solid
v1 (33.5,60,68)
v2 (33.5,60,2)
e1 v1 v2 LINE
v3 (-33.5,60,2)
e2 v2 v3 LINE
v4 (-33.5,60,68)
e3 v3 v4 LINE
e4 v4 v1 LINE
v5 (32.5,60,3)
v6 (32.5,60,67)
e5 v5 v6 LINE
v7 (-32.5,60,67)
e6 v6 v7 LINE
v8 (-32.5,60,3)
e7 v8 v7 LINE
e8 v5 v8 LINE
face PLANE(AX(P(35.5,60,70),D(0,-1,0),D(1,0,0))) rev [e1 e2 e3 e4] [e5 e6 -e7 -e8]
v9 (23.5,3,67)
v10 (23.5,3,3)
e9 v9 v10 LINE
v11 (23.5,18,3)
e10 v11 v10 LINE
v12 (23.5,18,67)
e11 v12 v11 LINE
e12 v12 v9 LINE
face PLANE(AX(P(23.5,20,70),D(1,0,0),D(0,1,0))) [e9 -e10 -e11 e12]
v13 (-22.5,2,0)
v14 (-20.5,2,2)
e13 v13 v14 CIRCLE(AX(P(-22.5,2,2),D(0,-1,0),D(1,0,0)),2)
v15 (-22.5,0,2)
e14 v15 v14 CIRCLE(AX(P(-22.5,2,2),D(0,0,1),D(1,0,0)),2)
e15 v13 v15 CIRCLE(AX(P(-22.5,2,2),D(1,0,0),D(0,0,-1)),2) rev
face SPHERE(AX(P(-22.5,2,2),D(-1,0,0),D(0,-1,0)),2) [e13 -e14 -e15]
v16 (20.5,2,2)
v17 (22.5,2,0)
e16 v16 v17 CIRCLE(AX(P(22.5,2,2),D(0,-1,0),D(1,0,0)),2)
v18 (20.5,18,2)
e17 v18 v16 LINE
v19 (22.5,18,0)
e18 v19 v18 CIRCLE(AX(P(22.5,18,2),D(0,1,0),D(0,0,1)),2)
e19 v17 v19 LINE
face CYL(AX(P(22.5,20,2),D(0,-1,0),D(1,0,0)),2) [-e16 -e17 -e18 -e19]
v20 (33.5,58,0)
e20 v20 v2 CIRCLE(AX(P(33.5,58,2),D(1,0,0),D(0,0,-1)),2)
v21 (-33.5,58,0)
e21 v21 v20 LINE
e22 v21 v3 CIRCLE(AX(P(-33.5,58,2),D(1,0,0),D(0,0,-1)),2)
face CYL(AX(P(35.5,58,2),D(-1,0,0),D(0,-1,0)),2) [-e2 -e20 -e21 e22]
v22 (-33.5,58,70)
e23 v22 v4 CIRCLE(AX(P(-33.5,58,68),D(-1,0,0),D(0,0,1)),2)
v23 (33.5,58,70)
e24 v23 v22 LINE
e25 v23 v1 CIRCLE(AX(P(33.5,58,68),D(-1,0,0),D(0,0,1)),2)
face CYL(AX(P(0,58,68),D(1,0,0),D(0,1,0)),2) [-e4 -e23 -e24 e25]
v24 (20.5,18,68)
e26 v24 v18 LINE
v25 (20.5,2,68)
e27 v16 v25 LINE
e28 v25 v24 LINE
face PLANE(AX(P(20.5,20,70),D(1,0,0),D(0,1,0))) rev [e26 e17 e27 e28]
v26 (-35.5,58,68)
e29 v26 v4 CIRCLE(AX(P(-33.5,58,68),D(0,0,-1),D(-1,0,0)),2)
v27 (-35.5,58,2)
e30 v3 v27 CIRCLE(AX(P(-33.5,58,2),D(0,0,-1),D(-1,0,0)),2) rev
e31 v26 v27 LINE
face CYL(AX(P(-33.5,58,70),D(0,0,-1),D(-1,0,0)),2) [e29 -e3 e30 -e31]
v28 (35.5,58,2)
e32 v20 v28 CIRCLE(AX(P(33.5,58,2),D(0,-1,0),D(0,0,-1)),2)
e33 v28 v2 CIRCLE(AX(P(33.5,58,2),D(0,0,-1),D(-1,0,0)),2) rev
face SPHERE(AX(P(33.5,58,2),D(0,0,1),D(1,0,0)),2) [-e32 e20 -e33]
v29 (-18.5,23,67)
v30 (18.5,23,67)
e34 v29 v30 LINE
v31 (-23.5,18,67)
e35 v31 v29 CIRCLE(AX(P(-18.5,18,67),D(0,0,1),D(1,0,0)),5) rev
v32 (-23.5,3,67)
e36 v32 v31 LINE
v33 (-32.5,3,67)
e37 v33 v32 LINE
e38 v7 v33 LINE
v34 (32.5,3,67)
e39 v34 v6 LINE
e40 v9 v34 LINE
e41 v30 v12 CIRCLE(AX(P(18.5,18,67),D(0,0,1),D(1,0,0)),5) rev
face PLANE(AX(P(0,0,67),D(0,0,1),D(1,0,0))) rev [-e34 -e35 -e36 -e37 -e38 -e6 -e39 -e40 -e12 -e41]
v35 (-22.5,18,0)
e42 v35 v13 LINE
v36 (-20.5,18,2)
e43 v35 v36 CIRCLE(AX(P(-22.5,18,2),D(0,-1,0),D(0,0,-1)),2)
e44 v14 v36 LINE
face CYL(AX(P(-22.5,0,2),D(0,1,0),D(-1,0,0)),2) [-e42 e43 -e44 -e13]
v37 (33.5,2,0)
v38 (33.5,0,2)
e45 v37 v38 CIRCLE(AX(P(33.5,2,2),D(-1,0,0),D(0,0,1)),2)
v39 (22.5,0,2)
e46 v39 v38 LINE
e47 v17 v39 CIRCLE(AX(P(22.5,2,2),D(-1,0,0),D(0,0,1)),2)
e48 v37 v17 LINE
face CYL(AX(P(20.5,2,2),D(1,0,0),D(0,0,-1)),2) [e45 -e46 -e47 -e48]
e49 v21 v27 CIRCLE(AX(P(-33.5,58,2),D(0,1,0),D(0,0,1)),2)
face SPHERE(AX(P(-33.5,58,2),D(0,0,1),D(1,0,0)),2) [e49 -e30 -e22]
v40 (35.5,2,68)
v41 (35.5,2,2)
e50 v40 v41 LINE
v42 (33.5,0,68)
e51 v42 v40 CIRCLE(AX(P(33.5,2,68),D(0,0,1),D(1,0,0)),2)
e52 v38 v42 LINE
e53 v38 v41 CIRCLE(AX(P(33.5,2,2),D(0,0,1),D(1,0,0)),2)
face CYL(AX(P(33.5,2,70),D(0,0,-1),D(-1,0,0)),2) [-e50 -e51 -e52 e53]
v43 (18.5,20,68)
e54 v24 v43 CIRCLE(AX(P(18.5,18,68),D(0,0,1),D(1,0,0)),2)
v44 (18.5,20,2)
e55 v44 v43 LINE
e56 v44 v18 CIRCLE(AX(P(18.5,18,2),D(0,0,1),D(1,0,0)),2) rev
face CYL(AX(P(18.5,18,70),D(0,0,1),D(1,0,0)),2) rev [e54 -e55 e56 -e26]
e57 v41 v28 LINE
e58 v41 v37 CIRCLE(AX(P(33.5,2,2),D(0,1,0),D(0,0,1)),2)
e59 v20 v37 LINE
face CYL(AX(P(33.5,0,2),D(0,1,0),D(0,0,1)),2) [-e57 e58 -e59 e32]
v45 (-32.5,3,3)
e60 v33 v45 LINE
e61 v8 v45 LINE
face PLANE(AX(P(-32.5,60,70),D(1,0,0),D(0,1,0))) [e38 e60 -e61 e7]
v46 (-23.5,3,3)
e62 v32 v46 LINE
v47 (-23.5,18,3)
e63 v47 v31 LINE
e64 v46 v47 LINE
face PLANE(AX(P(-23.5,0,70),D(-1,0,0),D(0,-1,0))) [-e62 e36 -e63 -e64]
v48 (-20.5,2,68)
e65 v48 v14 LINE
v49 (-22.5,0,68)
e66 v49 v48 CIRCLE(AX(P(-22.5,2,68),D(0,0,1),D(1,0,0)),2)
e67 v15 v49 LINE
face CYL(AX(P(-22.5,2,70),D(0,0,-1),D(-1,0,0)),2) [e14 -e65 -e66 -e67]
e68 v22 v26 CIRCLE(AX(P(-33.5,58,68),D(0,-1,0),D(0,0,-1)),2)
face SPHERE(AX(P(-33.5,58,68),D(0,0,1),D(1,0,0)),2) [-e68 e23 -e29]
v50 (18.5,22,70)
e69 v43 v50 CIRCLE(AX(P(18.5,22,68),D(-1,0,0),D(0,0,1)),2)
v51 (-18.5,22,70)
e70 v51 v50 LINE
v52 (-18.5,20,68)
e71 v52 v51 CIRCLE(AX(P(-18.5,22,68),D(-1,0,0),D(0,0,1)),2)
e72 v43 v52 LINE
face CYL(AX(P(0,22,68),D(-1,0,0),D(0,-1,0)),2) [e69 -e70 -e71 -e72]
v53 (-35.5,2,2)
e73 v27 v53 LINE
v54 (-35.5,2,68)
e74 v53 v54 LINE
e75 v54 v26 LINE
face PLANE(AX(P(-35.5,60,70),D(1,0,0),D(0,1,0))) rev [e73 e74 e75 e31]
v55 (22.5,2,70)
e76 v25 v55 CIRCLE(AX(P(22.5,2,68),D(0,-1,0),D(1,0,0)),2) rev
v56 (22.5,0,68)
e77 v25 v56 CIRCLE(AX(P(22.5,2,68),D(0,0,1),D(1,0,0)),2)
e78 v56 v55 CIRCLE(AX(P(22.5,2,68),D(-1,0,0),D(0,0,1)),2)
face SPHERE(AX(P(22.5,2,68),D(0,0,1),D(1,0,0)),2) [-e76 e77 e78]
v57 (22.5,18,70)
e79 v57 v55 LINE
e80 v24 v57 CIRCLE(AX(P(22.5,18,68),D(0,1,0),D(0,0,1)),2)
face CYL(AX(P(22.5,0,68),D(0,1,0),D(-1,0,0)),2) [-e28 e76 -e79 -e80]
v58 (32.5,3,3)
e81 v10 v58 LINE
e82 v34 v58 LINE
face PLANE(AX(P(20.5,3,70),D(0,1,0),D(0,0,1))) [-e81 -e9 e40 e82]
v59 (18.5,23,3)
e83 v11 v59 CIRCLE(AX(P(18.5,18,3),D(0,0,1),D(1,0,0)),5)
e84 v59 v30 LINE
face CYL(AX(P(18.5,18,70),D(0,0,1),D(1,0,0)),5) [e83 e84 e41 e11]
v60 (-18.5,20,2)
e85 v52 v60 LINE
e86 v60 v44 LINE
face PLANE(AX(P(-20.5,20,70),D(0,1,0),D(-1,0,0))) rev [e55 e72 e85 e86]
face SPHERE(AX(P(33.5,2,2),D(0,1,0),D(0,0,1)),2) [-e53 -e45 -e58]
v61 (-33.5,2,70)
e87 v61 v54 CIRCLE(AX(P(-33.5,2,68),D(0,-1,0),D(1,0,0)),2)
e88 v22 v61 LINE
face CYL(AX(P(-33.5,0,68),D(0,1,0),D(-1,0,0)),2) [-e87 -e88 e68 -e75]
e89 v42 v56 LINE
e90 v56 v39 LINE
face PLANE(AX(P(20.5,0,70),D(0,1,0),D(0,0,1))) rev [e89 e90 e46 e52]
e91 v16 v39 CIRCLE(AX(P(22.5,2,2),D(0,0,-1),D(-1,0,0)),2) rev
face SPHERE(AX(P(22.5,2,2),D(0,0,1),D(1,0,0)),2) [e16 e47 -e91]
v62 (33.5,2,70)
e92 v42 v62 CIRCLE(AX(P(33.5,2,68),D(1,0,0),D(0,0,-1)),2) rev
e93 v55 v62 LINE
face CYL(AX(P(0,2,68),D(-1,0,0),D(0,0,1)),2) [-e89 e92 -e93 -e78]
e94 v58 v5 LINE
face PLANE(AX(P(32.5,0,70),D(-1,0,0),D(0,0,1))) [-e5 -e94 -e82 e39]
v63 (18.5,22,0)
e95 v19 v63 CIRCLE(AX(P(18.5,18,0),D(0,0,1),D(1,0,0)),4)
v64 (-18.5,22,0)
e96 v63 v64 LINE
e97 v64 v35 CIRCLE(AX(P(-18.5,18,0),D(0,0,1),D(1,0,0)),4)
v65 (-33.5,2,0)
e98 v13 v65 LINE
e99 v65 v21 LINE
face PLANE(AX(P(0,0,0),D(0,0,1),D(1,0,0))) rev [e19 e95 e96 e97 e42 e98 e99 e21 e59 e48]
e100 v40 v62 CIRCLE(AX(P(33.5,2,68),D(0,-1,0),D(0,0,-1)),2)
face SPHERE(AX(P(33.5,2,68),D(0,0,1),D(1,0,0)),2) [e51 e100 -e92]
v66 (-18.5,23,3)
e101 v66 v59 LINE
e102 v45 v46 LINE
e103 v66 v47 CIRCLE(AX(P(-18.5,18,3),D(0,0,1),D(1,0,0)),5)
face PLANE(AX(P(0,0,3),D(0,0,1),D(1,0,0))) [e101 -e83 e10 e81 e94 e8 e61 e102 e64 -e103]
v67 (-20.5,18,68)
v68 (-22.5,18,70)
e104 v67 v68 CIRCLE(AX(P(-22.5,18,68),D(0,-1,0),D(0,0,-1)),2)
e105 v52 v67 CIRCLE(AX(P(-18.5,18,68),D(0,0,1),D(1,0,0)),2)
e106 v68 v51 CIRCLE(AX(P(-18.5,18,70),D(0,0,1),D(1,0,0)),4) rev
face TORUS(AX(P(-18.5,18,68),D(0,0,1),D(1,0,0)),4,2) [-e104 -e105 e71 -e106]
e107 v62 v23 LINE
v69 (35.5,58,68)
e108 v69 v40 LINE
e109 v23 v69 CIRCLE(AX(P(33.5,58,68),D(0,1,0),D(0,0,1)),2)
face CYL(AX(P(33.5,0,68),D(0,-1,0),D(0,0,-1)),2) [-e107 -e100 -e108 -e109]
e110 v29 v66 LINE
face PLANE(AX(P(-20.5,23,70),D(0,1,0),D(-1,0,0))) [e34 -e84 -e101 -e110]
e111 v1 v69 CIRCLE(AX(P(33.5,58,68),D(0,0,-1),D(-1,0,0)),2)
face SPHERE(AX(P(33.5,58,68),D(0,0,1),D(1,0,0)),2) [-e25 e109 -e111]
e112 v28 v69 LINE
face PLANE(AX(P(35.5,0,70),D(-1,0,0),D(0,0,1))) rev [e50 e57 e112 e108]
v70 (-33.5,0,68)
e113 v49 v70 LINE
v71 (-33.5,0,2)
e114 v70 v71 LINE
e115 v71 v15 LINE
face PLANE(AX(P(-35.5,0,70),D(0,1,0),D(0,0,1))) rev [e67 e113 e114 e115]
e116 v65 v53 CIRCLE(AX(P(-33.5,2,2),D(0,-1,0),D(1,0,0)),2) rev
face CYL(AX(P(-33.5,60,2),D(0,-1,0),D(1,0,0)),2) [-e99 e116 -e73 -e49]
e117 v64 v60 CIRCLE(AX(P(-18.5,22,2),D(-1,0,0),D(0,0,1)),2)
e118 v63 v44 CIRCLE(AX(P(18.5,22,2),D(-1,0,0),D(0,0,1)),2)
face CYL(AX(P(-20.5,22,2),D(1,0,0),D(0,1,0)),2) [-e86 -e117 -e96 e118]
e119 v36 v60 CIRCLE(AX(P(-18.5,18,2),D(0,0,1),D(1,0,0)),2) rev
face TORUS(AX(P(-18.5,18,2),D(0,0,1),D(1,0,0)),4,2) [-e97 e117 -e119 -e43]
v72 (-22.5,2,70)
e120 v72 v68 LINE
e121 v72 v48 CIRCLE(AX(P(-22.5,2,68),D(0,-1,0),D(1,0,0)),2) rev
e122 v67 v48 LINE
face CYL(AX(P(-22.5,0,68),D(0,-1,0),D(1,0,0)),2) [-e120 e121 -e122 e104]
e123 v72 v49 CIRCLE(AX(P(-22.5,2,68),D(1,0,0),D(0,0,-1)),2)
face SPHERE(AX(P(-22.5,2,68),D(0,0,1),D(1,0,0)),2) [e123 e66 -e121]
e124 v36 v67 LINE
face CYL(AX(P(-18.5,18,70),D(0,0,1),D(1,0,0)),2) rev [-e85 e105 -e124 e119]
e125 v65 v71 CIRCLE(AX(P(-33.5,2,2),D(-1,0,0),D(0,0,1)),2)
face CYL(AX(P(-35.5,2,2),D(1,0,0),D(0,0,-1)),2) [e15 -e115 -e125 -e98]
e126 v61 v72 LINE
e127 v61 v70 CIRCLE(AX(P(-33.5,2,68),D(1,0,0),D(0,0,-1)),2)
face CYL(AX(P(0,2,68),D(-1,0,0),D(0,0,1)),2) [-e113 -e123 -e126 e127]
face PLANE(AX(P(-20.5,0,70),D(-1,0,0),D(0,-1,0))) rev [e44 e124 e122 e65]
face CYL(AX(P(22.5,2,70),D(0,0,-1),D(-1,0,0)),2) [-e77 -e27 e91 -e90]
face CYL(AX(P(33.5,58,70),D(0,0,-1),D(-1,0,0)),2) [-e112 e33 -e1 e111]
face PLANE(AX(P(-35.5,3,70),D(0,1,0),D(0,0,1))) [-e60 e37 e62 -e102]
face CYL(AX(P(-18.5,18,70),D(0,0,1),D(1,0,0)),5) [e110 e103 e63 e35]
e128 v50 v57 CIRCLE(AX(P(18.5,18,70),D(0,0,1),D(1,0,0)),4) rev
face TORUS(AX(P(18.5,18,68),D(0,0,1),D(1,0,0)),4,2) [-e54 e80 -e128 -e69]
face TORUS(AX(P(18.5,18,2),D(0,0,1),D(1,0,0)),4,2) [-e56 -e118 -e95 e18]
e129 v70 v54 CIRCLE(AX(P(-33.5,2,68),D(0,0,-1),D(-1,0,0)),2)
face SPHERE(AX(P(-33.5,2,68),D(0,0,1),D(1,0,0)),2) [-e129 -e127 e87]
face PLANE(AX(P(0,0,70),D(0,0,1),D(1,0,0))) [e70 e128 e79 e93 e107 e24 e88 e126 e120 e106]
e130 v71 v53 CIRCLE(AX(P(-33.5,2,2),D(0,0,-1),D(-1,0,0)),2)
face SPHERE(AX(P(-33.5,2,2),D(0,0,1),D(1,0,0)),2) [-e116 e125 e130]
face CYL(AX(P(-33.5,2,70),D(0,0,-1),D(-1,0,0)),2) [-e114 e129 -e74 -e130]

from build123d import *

# Parameters (mm, degrees)
BOSS_EXTRU_2_DEPTH = 70
CONG_4_R           = 2
CONG_3_R           = 2
CONG_5_R           = 2
CONG_6_R           = 2
COQUE1_START       = 3
COQUE1_DEPTH       = 64
CONG_7_R           = 2
CONG_8_R           = 2


# Read off the part's stored shape, not the designer's step: Coque1
with BuildPart() as part:
    # Esquisse2 → Boss.-Extru.2 (new body)
    with BuildSketch(Plane.XY):
        Polygon((-35.5, 0), (-20.5, 0), (-20.5, 20), (20.5, 20), (20.5, 0), (35.5, 0), (35.5, 60), (-35.5, 60), align=None)
    extrude(amount=BOSS_EXTRU_2_DEPTH)

    # Congé4
    cong_4_edges = [part.edges().sort_by_distance(p)[0] for p in [
        (-35.5, 60, 35),
    ]]
    fillet(cong_4_edges, radius=CONG_4_R)

    # Congé3
    cong_3_edges = [part.edges().sort_by_distance(p)[0] for p in [
        (35.5, 60, 35),
    ]]
    fillet(cong_3_edges, radius=CONG_3_R)

    # Congé5
    cong_5_edges = [part.edges().sort_by_distance(p)[0] for p in [
        (20.5, 20, 35),
    ]]
    fillet(cong_5_edges, radius=CONG_5_R)

    # Congé6
    cong_6_edges = [part.edges().sort_by_distance(p)[0] for p in [
        (-20.5, 20, 35),
    ]]
    fillet(cong_6_edges, radius=CONG_6_R)

    # Coque1 outline → Coque1 (cut)
    with BuildSketch(Plane.XY.offset(COQUE1_START)):
        with BuildLine():
            Line((-32.5, 60), (-32.5, 3))
            Line((-32.5, 3), (-23.5, 3))
            Line((-23.5, 3), (-23.5, 18))
            ThreePointArc((-23.5, 18), (-22.035533906, 21.535533906), (-18.5, 23))
            Line((-18.5, 23), (18.5, 23))
            ThreePointArc((18.5, 23), (22.035533906, 21.535533906), (23.5, 18))
            Line((23.5, 18), (23.5, 3))
            Line((23.5, 3), (32.5, 3))
            Line((32.5, 3), (32.5, 60))
            Line((32.5, 60), (-32.5, 60))
        make_face()
    extrude(amount=COQUE1_DEPTH, mode=Mode.SUBTRACT)

    # Congé7
    cong_7_edges = [part.edges().sort_by_distance(p)[0] for p in [
        (35.5, 29, 0),
        (34.914213562, 59.414213562, 0),
        (0, 60, 0),
        (-34.914213562, 59.414213562, 0),
        (-28, 0, 0),
        (-35.5, 0, 35),
        (-35.5, 29, 0),
    ]]
    fillet(cong_7_edges, radius=CONG_7_R)

    # Congé8
    cong_8_edges = [part.edges().sort_by_distance(p)[0] for p in [
        (-20.5, 9, 70),
        (35.5, 0, 36),
        (20.5, 0, 35),
        (-20.5, 0, 36),
        (28, 0, 70),
        (35.5, 29, 70),
        (-35.5, 30, 70),
        (-34.914213562, 59.414213562, 70),
        (0, 60, 70),
        (34.914213562, 59.414213562, 70),
        (20.5, 9, 0),
        (20.5, 9, 70),
        (19.914213562, 19.414213562, 0),
        (19.914213562, 19.414213562, 70),
        (0, 20, 0),
        (0, 20, 70),
        (-19.914213562, 19.414213562, 0),
        (-19.914213562, 19.414213562, 70),
        (-20.5, 10, 0),
        (34.914213562, 0, 0.585786438),
        (-27, 0, 70),
        (-20.5, 0.585786438, 0.585786438),
        (-34.914213562, 0.585786438, 70),
        (27, 0, 0),
    ]]
    fillet(cong_8_edges, radius=CONG_8_R)


solid = part.part
